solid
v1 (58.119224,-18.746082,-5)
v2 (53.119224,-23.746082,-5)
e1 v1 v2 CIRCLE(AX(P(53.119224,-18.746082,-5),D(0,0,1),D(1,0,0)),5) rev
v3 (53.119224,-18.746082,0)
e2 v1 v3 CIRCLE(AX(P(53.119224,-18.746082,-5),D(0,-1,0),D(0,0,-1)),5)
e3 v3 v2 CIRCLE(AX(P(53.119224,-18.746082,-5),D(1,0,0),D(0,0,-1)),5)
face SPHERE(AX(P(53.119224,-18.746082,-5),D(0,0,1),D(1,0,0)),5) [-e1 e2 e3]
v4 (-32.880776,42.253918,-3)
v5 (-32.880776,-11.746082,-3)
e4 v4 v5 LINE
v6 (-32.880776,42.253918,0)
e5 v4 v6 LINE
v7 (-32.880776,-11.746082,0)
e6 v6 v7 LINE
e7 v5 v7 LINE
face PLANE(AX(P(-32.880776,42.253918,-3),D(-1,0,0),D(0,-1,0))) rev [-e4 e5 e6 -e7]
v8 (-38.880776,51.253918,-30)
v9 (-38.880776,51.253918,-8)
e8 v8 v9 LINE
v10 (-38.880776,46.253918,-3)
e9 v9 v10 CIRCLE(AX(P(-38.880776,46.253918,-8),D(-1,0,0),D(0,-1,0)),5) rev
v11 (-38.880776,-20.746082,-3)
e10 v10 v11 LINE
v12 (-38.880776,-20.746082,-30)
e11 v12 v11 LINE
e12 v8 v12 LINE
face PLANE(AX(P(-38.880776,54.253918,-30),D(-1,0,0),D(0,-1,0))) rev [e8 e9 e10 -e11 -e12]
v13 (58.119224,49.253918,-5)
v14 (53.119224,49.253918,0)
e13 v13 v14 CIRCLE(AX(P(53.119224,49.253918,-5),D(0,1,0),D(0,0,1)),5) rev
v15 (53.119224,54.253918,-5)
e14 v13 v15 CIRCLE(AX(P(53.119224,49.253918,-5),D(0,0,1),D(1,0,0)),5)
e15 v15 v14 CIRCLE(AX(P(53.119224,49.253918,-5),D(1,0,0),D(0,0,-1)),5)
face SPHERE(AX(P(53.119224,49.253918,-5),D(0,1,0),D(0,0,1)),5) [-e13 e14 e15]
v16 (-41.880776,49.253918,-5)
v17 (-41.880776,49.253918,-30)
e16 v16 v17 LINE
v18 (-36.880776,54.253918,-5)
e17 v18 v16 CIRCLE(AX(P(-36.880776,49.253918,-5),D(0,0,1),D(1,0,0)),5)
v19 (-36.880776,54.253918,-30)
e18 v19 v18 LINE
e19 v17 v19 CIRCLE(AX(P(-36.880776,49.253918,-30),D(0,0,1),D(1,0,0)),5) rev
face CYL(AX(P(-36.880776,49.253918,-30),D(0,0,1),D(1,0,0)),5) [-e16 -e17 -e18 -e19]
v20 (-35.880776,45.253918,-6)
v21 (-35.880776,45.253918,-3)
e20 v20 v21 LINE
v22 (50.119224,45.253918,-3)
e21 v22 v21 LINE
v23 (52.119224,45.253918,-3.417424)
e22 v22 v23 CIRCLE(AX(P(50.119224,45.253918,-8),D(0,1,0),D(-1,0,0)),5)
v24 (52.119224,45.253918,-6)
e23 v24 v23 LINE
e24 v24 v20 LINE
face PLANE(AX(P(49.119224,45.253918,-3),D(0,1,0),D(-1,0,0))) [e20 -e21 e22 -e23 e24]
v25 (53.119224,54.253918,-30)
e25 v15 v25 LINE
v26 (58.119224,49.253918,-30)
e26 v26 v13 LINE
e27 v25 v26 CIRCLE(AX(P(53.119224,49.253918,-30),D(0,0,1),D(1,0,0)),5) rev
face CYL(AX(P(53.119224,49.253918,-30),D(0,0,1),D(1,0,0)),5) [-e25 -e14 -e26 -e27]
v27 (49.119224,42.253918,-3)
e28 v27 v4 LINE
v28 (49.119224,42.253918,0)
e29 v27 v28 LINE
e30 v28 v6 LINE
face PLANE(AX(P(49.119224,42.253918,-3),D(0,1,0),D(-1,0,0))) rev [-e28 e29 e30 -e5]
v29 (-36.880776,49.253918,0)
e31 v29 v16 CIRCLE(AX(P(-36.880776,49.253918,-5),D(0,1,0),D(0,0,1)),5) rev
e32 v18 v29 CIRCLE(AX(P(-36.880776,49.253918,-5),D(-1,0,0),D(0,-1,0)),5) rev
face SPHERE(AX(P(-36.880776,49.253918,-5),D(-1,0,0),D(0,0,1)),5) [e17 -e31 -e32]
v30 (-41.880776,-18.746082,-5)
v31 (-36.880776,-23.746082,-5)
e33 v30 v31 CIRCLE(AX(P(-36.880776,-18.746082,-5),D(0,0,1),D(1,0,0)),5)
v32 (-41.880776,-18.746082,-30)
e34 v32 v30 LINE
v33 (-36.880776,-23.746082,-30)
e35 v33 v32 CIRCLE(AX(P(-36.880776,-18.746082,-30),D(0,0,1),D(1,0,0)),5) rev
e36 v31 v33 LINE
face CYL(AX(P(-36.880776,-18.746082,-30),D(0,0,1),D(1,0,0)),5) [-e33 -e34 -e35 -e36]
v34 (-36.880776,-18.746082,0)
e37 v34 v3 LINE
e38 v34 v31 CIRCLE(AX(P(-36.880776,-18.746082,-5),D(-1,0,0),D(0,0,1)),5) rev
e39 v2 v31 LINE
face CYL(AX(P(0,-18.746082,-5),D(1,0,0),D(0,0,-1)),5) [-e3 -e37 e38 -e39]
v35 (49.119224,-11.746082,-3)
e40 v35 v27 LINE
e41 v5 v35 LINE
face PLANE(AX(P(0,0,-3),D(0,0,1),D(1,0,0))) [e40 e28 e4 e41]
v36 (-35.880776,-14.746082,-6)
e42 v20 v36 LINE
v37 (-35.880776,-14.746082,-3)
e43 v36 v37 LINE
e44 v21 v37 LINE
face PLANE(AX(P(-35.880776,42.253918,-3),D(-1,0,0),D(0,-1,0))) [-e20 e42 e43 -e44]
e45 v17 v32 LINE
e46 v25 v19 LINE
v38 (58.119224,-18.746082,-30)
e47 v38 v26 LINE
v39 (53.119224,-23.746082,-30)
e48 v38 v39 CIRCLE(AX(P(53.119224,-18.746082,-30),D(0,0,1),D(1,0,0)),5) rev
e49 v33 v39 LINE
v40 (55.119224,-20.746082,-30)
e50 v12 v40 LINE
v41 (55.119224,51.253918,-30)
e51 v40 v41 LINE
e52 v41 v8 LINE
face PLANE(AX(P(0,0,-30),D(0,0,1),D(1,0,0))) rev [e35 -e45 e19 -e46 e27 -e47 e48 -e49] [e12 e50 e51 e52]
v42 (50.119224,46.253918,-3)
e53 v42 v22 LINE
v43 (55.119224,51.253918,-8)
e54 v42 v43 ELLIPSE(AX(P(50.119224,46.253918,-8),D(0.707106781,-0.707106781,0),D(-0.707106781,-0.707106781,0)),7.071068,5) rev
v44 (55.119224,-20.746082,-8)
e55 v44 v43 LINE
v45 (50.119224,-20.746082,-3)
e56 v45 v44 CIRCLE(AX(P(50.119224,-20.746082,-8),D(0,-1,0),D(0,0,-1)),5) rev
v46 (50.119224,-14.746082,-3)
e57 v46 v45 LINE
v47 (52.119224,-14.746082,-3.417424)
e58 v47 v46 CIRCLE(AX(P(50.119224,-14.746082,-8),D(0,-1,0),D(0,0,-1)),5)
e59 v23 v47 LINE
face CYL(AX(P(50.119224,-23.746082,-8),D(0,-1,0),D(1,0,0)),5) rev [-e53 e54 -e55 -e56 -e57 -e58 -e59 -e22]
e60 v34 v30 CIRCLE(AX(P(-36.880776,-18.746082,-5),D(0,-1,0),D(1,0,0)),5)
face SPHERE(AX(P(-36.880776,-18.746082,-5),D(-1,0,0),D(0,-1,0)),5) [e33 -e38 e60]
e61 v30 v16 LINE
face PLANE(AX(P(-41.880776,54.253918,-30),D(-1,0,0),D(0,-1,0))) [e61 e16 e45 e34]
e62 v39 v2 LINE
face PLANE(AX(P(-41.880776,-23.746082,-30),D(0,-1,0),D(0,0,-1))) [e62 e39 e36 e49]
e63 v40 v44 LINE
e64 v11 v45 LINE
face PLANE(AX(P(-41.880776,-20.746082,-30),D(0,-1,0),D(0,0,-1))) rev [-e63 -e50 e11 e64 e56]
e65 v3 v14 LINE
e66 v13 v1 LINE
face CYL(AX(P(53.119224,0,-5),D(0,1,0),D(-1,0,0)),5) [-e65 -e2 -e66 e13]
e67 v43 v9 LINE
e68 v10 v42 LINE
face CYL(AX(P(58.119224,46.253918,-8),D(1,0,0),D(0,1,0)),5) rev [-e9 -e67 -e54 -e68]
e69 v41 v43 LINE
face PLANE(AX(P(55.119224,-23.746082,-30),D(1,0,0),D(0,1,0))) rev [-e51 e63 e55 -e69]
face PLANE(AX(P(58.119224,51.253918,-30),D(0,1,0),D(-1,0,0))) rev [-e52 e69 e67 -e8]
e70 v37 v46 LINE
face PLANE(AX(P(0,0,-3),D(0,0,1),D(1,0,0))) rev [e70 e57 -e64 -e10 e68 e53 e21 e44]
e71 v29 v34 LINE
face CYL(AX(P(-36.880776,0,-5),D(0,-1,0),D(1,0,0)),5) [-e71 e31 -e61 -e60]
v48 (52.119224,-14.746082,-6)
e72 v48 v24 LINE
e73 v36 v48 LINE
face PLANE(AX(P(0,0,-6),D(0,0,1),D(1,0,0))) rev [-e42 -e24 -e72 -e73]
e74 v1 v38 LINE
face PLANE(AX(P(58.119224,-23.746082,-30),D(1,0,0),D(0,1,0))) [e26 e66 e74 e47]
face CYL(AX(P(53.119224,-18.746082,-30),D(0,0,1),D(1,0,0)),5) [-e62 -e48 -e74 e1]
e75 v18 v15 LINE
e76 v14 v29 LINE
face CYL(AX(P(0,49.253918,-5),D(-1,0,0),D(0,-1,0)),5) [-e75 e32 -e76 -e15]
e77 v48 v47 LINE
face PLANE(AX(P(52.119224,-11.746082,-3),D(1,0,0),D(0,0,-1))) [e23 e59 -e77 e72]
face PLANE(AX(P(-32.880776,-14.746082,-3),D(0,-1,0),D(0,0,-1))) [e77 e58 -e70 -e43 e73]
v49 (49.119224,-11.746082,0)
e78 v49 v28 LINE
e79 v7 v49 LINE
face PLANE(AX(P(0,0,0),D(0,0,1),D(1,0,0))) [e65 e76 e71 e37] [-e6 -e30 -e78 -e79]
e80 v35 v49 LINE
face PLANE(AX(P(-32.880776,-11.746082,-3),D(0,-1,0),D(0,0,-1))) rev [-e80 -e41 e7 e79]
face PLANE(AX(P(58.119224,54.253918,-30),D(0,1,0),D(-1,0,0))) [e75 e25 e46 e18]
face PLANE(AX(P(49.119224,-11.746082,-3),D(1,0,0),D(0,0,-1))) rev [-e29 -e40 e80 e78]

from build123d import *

# Parameters (mm, degrees)
SKETCH1_W           = 100
SKETCH1_H           = 78
BOSS_EXTRUDE1_DEPTH = 30
SKETCH3_W           = 82
SKETCH3_H           = 54
CUT_EXTRUDE1_DEPTH  = 3
SHELL1_T            = -3
FILLET1_R           = 5
FILLET2_R           = 5


with BuildPart() as part:
    # Sketch1 → Boss-Extrude1 (new body)
    with BuildSketch(Plane.XY):
        with Locations((8.119223597, 15.253918495)):
            Rectangle(SKETCH1_W, SKETCH1_H)
    extrude(amount=-BOSS_EXTRUDE1_DEPTH)

    # Sketch3 → Cut-Extrude1 (cut)
    with BuildSketch(Plane.XY):
        with Locations((8.119223597, 15.253918495)):
            Rectangle(SKETCH3_W, SKETCH3_H)
    extrude(amount=-CUT_EXTRUDE1_DEPTH, mode=Mode.SUBTRACT)

    # Shell1
    shell1_openings = [part.faces().sort_by_distance(p)[0] for p in [
        (8.119223597, 15.253918495, -30),
    ]]
    offset(amount=SHELL1_T, openings=shell1_openings, kind=Kind.INTERSECTION)

    # Fillet1
    fillet1_edges = [part.edges().sort_by_distance(p)[0] for p in [
        (8.119223597, -23.746081505, 0),
        (-41.880776403, 15.253918495, 0),
        (8.119223597, 54.253918495, 0),
        (58.119223597, 15.253918495, 0),
        (58.119223597, -23.746081505, -15),
        (-41.880776403, -23.746081505, -15),
        (-41.880776403, 54.253918495, -15),
        (58.119223597, 54.253918495, -15),
    ]]
    fillet(fillet1_edges, radius=FILLET1_R)

    # Fillet2
    # the kernel refuses this fillet: 5 mm, written as the material it adds along each edge
    with BuildSketch(Plane(origin=(55.119223597, -20.746081505, -3), x_dir=(0, 0, -1), z_dir=(0, 1, 0))) as fillet2_piece_1:
        with BuildLine():
            CenterArc((FILLET2_R, FILLET2_R), FILLET2_R, 180, 90)
            Line((0, FILLET2_R), (0, 0))
            Line((0, 0), (FILLET2_R, 0))
        make_face()
    extrude(amount=72)
    with BuildSketch(Plane(origin=(-38.880776403, 51.253918495, -3), x_dir=(0, 0, -1), z_dir=(1, 0, 0))) as fillet2_piece_2:
        with BuildLine():
            CenterArc((FILLET2_R, -FILLET2_R), FILLET2_R, 90, 90)
            Line((0, -FILLET2_R), (0, 0))
            Line((0, 0), (FILLET2_R, 0))
        make_face()
    extrude(amount=94)


solid = part.part
